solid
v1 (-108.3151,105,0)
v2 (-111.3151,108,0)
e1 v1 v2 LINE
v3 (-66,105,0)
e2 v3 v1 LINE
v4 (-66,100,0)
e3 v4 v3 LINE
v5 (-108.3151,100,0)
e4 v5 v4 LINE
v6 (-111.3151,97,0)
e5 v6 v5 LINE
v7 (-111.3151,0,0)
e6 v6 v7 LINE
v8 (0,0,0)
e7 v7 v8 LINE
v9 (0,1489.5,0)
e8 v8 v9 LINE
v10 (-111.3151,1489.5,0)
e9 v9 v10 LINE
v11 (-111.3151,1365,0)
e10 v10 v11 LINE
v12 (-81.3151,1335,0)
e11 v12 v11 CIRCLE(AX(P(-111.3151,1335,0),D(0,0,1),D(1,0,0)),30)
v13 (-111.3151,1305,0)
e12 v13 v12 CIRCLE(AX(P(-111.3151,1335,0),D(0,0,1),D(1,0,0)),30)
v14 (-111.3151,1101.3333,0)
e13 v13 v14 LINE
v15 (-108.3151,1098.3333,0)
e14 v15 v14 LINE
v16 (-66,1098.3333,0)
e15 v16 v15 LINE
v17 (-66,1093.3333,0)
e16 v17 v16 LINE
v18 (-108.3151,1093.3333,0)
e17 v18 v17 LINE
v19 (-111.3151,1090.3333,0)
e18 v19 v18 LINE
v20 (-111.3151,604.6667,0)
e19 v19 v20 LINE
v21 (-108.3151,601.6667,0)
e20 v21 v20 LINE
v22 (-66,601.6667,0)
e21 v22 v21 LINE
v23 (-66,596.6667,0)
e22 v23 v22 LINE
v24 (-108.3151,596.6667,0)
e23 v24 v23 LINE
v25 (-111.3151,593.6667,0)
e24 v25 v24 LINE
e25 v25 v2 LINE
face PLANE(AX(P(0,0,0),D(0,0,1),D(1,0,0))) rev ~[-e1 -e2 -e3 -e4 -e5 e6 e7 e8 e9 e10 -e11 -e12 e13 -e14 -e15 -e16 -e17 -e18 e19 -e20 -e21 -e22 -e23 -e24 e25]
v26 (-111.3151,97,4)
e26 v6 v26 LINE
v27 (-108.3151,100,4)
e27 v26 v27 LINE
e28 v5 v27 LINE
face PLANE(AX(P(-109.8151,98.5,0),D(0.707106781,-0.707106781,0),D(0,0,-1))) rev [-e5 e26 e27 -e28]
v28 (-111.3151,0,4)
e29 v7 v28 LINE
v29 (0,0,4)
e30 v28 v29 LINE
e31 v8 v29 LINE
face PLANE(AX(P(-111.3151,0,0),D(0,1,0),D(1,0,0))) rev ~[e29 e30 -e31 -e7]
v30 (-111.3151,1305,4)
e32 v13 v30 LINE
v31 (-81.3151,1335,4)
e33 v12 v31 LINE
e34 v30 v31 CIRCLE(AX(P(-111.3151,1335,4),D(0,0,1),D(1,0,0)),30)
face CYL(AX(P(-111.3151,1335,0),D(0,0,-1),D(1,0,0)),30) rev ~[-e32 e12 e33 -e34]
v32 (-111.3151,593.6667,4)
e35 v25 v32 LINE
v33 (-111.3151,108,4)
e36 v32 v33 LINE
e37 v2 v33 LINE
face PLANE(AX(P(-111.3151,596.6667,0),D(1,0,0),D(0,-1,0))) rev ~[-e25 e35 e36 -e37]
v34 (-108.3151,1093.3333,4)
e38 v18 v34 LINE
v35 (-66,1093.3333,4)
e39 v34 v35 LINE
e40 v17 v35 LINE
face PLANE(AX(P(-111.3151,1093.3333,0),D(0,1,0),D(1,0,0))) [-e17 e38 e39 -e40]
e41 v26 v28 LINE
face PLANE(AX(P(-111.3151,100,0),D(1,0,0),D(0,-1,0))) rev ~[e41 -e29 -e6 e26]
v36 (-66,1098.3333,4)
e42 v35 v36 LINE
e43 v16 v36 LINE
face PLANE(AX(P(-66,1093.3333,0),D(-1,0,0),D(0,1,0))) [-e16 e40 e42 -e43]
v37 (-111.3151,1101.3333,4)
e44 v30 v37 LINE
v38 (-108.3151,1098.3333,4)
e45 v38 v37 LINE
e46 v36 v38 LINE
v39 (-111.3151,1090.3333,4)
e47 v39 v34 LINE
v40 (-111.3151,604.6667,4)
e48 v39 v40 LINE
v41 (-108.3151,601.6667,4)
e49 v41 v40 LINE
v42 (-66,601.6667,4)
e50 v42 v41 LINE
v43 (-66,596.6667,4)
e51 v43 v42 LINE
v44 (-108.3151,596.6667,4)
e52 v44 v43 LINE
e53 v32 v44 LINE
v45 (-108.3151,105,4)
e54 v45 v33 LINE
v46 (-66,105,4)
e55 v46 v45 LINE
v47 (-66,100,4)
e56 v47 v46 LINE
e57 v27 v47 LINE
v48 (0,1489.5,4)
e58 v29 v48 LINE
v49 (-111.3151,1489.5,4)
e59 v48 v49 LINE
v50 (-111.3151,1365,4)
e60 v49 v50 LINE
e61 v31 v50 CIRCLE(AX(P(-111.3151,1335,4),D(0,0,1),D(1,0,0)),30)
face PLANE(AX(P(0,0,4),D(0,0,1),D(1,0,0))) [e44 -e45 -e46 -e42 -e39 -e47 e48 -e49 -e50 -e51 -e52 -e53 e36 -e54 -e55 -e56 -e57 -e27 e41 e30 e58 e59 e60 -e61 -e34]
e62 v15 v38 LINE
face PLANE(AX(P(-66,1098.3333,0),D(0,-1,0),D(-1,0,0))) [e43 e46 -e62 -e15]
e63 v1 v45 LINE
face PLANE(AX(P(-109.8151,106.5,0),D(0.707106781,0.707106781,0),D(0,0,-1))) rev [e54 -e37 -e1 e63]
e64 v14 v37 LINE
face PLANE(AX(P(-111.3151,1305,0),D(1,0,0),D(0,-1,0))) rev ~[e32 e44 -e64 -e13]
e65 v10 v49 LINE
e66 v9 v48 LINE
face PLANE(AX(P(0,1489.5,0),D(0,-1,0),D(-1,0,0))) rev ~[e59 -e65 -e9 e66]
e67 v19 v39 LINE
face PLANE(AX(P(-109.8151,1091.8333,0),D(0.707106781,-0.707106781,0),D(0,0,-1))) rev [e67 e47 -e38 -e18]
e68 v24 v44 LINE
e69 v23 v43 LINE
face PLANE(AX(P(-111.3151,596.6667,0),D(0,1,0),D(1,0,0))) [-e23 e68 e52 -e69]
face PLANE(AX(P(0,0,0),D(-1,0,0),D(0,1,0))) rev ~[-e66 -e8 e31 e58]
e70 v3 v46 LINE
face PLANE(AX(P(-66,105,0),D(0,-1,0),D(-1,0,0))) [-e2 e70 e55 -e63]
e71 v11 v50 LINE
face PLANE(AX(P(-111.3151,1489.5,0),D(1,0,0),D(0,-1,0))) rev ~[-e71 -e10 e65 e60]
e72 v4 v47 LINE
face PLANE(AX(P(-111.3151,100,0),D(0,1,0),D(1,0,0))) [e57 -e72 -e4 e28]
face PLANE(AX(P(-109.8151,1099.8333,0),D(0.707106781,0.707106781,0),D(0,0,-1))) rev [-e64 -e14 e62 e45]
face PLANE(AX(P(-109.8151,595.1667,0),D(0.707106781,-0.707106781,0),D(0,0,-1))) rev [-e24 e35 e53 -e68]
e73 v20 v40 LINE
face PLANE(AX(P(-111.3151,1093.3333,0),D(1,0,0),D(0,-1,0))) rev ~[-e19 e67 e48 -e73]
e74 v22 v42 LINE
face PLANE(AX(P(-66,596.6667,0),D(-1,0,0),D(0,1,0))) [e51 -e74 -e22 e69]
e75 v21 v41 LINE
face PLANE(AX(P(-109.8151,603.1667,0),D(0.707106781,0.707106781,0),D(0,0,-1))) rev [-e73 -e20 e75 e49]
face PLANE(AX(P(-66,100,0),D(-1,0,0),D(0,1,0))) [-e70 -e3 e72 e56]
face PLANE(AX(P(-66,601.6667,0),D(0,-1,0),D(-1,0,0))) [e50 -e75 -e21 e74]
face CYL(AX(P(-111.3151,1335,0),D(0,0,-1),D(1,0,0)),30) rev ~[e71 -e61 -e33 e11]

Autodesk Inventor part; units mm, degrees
ref_plane "YZ Plane" through (0, 0, 0) normal (1, 0, 0) x (0, 1, 0)
ref_plane "XZ Plane" through (0, 0, 0) normal (0, 1, 0) x (-1, 0, 0)
ref_plane "XY Plane" through (0, 0, 0) normal (0, 0, 1) x (1, 0, 0)
sketch "Sketch1" plane through (0, 0, 0) normal (0, 0, 1) x (1, 0, 0)
  line L0 (0, 1489.5) -> (-111.3151, 1489.5)
  line L1 (-111.3151, 1489.5) -> (-111.3151, 0)
  line L2 (-111.3151, 0) -> (0, 0)
  line L3 (0, 0) -> (0, 1489.5)
  line L4 (-111.3151, 100) -> (-66, 100)
  line L5 (-66, 100) -> (-66, 105)
  line L6 (-66, 105) -> (-111.3151, 105)
  line L7 (-111.3151, 105) -> (-111.3151, 100)
  line L8 (-111.3151, 596.6667) -> (-66, 596.6667)
  line L9 (-66, 596.6667) -> (-66, 601.6667)
  line L10 (-66, 601.6667) -> (-111.3151, 601.6667)
  line L11 (-111.3151, 601.6667) -> (-111.3151, 596.6667)
  line L12 (-111.3151, 1093.3333) -> (-66, 1093.3333)
  line L13 (-66, 1093.3333) -> (-66, 1098.3333)
  line L14 (-66, 1098.3333) -> (-111.3151, 1098.3333)
  line L15 (-111.3151, 1098.3333) -> (-111.3151, 1093.3333)
  circle A0 centre (-111.3151, 1335) radius 30
  point P0 (-111.3151, 1098.3333)
  point P1 (-111.3151, 601.6667)
  point P2 (-111.3151, 1365)
  point P3 (-111.3151, 1305)
  dimension "d0" = 1489.5
  dimension "d1" = 111.3151
  dimension "d2" = 5
  dimension "d4" = 100
  dimension "d7" = 496.6667
  dimension "d23" = 66
  dimension "d29" = 60
  dimension "d30" = 1335
extrude "Plate1" add sketch "Sketch1" along normal blind 4 contours L3 L2 L1 L4 L5 L6 L8 L9 L10 L12 L13 L14 A0 L0
chamfer "Corner Chamfer1" distance 3 angle 45 6 edges at (-111.3151, 100, 2) (-111.3151, 105, 2) (-111.3151, 596.6667, 2) (-111.3151, 601.6667, 2) (-111.3151, 1098.3333, 2) (-111.3151, 1093.3333, 2)
equation "\"d0\" = Стрингер_длина"
equation "\"d1\" = стрингер_глубина_8"
equation "\"d2\" = паз_под_стрингер_толщина"
equation "\"d7\" = Шаг_шпангоутов"
equation "\"d23\" = паз_под_стрингер_глубина - Thickness"
equation "\"d29\" = 2 * радиус_выреза_под_сварку"
equation "\"d12\" = Thickness"
equation "\"BendRadius\" = Thickness"
equation "\"BendReliefWidth\" = Thickness"
equation "\"BendReliefDepth\" = 0.5 * Thickness"
equation "\"CornerReliefSize\" = 4 * Thickness"
equation "\"MinimumRemnant\" = 2 * Thickness"
equation "\"TransitionRadius\" = BendRadius"
equation "\"JacobiRadiusSize\" = BendRadius"
equation "\"GapSize\" = Thickness"
equation "\"Стрингер_длина\" = 1489.5"
equation "\"стрингер_глубина_8\" = 111.315065"
equation "\"паз_под_стрингер_толщина\" = 5"
equation "\"Шаг_шпангоутов\" = 496.666667"
equation "\"паз_под_стрингер_глубина\" = 70"
equation "\"Thickness\" = 4"
equation "\"радиус_выреза_под_сварку\" = 30"
properties part number "GBK 3313 stringer 8" material "Steel"
